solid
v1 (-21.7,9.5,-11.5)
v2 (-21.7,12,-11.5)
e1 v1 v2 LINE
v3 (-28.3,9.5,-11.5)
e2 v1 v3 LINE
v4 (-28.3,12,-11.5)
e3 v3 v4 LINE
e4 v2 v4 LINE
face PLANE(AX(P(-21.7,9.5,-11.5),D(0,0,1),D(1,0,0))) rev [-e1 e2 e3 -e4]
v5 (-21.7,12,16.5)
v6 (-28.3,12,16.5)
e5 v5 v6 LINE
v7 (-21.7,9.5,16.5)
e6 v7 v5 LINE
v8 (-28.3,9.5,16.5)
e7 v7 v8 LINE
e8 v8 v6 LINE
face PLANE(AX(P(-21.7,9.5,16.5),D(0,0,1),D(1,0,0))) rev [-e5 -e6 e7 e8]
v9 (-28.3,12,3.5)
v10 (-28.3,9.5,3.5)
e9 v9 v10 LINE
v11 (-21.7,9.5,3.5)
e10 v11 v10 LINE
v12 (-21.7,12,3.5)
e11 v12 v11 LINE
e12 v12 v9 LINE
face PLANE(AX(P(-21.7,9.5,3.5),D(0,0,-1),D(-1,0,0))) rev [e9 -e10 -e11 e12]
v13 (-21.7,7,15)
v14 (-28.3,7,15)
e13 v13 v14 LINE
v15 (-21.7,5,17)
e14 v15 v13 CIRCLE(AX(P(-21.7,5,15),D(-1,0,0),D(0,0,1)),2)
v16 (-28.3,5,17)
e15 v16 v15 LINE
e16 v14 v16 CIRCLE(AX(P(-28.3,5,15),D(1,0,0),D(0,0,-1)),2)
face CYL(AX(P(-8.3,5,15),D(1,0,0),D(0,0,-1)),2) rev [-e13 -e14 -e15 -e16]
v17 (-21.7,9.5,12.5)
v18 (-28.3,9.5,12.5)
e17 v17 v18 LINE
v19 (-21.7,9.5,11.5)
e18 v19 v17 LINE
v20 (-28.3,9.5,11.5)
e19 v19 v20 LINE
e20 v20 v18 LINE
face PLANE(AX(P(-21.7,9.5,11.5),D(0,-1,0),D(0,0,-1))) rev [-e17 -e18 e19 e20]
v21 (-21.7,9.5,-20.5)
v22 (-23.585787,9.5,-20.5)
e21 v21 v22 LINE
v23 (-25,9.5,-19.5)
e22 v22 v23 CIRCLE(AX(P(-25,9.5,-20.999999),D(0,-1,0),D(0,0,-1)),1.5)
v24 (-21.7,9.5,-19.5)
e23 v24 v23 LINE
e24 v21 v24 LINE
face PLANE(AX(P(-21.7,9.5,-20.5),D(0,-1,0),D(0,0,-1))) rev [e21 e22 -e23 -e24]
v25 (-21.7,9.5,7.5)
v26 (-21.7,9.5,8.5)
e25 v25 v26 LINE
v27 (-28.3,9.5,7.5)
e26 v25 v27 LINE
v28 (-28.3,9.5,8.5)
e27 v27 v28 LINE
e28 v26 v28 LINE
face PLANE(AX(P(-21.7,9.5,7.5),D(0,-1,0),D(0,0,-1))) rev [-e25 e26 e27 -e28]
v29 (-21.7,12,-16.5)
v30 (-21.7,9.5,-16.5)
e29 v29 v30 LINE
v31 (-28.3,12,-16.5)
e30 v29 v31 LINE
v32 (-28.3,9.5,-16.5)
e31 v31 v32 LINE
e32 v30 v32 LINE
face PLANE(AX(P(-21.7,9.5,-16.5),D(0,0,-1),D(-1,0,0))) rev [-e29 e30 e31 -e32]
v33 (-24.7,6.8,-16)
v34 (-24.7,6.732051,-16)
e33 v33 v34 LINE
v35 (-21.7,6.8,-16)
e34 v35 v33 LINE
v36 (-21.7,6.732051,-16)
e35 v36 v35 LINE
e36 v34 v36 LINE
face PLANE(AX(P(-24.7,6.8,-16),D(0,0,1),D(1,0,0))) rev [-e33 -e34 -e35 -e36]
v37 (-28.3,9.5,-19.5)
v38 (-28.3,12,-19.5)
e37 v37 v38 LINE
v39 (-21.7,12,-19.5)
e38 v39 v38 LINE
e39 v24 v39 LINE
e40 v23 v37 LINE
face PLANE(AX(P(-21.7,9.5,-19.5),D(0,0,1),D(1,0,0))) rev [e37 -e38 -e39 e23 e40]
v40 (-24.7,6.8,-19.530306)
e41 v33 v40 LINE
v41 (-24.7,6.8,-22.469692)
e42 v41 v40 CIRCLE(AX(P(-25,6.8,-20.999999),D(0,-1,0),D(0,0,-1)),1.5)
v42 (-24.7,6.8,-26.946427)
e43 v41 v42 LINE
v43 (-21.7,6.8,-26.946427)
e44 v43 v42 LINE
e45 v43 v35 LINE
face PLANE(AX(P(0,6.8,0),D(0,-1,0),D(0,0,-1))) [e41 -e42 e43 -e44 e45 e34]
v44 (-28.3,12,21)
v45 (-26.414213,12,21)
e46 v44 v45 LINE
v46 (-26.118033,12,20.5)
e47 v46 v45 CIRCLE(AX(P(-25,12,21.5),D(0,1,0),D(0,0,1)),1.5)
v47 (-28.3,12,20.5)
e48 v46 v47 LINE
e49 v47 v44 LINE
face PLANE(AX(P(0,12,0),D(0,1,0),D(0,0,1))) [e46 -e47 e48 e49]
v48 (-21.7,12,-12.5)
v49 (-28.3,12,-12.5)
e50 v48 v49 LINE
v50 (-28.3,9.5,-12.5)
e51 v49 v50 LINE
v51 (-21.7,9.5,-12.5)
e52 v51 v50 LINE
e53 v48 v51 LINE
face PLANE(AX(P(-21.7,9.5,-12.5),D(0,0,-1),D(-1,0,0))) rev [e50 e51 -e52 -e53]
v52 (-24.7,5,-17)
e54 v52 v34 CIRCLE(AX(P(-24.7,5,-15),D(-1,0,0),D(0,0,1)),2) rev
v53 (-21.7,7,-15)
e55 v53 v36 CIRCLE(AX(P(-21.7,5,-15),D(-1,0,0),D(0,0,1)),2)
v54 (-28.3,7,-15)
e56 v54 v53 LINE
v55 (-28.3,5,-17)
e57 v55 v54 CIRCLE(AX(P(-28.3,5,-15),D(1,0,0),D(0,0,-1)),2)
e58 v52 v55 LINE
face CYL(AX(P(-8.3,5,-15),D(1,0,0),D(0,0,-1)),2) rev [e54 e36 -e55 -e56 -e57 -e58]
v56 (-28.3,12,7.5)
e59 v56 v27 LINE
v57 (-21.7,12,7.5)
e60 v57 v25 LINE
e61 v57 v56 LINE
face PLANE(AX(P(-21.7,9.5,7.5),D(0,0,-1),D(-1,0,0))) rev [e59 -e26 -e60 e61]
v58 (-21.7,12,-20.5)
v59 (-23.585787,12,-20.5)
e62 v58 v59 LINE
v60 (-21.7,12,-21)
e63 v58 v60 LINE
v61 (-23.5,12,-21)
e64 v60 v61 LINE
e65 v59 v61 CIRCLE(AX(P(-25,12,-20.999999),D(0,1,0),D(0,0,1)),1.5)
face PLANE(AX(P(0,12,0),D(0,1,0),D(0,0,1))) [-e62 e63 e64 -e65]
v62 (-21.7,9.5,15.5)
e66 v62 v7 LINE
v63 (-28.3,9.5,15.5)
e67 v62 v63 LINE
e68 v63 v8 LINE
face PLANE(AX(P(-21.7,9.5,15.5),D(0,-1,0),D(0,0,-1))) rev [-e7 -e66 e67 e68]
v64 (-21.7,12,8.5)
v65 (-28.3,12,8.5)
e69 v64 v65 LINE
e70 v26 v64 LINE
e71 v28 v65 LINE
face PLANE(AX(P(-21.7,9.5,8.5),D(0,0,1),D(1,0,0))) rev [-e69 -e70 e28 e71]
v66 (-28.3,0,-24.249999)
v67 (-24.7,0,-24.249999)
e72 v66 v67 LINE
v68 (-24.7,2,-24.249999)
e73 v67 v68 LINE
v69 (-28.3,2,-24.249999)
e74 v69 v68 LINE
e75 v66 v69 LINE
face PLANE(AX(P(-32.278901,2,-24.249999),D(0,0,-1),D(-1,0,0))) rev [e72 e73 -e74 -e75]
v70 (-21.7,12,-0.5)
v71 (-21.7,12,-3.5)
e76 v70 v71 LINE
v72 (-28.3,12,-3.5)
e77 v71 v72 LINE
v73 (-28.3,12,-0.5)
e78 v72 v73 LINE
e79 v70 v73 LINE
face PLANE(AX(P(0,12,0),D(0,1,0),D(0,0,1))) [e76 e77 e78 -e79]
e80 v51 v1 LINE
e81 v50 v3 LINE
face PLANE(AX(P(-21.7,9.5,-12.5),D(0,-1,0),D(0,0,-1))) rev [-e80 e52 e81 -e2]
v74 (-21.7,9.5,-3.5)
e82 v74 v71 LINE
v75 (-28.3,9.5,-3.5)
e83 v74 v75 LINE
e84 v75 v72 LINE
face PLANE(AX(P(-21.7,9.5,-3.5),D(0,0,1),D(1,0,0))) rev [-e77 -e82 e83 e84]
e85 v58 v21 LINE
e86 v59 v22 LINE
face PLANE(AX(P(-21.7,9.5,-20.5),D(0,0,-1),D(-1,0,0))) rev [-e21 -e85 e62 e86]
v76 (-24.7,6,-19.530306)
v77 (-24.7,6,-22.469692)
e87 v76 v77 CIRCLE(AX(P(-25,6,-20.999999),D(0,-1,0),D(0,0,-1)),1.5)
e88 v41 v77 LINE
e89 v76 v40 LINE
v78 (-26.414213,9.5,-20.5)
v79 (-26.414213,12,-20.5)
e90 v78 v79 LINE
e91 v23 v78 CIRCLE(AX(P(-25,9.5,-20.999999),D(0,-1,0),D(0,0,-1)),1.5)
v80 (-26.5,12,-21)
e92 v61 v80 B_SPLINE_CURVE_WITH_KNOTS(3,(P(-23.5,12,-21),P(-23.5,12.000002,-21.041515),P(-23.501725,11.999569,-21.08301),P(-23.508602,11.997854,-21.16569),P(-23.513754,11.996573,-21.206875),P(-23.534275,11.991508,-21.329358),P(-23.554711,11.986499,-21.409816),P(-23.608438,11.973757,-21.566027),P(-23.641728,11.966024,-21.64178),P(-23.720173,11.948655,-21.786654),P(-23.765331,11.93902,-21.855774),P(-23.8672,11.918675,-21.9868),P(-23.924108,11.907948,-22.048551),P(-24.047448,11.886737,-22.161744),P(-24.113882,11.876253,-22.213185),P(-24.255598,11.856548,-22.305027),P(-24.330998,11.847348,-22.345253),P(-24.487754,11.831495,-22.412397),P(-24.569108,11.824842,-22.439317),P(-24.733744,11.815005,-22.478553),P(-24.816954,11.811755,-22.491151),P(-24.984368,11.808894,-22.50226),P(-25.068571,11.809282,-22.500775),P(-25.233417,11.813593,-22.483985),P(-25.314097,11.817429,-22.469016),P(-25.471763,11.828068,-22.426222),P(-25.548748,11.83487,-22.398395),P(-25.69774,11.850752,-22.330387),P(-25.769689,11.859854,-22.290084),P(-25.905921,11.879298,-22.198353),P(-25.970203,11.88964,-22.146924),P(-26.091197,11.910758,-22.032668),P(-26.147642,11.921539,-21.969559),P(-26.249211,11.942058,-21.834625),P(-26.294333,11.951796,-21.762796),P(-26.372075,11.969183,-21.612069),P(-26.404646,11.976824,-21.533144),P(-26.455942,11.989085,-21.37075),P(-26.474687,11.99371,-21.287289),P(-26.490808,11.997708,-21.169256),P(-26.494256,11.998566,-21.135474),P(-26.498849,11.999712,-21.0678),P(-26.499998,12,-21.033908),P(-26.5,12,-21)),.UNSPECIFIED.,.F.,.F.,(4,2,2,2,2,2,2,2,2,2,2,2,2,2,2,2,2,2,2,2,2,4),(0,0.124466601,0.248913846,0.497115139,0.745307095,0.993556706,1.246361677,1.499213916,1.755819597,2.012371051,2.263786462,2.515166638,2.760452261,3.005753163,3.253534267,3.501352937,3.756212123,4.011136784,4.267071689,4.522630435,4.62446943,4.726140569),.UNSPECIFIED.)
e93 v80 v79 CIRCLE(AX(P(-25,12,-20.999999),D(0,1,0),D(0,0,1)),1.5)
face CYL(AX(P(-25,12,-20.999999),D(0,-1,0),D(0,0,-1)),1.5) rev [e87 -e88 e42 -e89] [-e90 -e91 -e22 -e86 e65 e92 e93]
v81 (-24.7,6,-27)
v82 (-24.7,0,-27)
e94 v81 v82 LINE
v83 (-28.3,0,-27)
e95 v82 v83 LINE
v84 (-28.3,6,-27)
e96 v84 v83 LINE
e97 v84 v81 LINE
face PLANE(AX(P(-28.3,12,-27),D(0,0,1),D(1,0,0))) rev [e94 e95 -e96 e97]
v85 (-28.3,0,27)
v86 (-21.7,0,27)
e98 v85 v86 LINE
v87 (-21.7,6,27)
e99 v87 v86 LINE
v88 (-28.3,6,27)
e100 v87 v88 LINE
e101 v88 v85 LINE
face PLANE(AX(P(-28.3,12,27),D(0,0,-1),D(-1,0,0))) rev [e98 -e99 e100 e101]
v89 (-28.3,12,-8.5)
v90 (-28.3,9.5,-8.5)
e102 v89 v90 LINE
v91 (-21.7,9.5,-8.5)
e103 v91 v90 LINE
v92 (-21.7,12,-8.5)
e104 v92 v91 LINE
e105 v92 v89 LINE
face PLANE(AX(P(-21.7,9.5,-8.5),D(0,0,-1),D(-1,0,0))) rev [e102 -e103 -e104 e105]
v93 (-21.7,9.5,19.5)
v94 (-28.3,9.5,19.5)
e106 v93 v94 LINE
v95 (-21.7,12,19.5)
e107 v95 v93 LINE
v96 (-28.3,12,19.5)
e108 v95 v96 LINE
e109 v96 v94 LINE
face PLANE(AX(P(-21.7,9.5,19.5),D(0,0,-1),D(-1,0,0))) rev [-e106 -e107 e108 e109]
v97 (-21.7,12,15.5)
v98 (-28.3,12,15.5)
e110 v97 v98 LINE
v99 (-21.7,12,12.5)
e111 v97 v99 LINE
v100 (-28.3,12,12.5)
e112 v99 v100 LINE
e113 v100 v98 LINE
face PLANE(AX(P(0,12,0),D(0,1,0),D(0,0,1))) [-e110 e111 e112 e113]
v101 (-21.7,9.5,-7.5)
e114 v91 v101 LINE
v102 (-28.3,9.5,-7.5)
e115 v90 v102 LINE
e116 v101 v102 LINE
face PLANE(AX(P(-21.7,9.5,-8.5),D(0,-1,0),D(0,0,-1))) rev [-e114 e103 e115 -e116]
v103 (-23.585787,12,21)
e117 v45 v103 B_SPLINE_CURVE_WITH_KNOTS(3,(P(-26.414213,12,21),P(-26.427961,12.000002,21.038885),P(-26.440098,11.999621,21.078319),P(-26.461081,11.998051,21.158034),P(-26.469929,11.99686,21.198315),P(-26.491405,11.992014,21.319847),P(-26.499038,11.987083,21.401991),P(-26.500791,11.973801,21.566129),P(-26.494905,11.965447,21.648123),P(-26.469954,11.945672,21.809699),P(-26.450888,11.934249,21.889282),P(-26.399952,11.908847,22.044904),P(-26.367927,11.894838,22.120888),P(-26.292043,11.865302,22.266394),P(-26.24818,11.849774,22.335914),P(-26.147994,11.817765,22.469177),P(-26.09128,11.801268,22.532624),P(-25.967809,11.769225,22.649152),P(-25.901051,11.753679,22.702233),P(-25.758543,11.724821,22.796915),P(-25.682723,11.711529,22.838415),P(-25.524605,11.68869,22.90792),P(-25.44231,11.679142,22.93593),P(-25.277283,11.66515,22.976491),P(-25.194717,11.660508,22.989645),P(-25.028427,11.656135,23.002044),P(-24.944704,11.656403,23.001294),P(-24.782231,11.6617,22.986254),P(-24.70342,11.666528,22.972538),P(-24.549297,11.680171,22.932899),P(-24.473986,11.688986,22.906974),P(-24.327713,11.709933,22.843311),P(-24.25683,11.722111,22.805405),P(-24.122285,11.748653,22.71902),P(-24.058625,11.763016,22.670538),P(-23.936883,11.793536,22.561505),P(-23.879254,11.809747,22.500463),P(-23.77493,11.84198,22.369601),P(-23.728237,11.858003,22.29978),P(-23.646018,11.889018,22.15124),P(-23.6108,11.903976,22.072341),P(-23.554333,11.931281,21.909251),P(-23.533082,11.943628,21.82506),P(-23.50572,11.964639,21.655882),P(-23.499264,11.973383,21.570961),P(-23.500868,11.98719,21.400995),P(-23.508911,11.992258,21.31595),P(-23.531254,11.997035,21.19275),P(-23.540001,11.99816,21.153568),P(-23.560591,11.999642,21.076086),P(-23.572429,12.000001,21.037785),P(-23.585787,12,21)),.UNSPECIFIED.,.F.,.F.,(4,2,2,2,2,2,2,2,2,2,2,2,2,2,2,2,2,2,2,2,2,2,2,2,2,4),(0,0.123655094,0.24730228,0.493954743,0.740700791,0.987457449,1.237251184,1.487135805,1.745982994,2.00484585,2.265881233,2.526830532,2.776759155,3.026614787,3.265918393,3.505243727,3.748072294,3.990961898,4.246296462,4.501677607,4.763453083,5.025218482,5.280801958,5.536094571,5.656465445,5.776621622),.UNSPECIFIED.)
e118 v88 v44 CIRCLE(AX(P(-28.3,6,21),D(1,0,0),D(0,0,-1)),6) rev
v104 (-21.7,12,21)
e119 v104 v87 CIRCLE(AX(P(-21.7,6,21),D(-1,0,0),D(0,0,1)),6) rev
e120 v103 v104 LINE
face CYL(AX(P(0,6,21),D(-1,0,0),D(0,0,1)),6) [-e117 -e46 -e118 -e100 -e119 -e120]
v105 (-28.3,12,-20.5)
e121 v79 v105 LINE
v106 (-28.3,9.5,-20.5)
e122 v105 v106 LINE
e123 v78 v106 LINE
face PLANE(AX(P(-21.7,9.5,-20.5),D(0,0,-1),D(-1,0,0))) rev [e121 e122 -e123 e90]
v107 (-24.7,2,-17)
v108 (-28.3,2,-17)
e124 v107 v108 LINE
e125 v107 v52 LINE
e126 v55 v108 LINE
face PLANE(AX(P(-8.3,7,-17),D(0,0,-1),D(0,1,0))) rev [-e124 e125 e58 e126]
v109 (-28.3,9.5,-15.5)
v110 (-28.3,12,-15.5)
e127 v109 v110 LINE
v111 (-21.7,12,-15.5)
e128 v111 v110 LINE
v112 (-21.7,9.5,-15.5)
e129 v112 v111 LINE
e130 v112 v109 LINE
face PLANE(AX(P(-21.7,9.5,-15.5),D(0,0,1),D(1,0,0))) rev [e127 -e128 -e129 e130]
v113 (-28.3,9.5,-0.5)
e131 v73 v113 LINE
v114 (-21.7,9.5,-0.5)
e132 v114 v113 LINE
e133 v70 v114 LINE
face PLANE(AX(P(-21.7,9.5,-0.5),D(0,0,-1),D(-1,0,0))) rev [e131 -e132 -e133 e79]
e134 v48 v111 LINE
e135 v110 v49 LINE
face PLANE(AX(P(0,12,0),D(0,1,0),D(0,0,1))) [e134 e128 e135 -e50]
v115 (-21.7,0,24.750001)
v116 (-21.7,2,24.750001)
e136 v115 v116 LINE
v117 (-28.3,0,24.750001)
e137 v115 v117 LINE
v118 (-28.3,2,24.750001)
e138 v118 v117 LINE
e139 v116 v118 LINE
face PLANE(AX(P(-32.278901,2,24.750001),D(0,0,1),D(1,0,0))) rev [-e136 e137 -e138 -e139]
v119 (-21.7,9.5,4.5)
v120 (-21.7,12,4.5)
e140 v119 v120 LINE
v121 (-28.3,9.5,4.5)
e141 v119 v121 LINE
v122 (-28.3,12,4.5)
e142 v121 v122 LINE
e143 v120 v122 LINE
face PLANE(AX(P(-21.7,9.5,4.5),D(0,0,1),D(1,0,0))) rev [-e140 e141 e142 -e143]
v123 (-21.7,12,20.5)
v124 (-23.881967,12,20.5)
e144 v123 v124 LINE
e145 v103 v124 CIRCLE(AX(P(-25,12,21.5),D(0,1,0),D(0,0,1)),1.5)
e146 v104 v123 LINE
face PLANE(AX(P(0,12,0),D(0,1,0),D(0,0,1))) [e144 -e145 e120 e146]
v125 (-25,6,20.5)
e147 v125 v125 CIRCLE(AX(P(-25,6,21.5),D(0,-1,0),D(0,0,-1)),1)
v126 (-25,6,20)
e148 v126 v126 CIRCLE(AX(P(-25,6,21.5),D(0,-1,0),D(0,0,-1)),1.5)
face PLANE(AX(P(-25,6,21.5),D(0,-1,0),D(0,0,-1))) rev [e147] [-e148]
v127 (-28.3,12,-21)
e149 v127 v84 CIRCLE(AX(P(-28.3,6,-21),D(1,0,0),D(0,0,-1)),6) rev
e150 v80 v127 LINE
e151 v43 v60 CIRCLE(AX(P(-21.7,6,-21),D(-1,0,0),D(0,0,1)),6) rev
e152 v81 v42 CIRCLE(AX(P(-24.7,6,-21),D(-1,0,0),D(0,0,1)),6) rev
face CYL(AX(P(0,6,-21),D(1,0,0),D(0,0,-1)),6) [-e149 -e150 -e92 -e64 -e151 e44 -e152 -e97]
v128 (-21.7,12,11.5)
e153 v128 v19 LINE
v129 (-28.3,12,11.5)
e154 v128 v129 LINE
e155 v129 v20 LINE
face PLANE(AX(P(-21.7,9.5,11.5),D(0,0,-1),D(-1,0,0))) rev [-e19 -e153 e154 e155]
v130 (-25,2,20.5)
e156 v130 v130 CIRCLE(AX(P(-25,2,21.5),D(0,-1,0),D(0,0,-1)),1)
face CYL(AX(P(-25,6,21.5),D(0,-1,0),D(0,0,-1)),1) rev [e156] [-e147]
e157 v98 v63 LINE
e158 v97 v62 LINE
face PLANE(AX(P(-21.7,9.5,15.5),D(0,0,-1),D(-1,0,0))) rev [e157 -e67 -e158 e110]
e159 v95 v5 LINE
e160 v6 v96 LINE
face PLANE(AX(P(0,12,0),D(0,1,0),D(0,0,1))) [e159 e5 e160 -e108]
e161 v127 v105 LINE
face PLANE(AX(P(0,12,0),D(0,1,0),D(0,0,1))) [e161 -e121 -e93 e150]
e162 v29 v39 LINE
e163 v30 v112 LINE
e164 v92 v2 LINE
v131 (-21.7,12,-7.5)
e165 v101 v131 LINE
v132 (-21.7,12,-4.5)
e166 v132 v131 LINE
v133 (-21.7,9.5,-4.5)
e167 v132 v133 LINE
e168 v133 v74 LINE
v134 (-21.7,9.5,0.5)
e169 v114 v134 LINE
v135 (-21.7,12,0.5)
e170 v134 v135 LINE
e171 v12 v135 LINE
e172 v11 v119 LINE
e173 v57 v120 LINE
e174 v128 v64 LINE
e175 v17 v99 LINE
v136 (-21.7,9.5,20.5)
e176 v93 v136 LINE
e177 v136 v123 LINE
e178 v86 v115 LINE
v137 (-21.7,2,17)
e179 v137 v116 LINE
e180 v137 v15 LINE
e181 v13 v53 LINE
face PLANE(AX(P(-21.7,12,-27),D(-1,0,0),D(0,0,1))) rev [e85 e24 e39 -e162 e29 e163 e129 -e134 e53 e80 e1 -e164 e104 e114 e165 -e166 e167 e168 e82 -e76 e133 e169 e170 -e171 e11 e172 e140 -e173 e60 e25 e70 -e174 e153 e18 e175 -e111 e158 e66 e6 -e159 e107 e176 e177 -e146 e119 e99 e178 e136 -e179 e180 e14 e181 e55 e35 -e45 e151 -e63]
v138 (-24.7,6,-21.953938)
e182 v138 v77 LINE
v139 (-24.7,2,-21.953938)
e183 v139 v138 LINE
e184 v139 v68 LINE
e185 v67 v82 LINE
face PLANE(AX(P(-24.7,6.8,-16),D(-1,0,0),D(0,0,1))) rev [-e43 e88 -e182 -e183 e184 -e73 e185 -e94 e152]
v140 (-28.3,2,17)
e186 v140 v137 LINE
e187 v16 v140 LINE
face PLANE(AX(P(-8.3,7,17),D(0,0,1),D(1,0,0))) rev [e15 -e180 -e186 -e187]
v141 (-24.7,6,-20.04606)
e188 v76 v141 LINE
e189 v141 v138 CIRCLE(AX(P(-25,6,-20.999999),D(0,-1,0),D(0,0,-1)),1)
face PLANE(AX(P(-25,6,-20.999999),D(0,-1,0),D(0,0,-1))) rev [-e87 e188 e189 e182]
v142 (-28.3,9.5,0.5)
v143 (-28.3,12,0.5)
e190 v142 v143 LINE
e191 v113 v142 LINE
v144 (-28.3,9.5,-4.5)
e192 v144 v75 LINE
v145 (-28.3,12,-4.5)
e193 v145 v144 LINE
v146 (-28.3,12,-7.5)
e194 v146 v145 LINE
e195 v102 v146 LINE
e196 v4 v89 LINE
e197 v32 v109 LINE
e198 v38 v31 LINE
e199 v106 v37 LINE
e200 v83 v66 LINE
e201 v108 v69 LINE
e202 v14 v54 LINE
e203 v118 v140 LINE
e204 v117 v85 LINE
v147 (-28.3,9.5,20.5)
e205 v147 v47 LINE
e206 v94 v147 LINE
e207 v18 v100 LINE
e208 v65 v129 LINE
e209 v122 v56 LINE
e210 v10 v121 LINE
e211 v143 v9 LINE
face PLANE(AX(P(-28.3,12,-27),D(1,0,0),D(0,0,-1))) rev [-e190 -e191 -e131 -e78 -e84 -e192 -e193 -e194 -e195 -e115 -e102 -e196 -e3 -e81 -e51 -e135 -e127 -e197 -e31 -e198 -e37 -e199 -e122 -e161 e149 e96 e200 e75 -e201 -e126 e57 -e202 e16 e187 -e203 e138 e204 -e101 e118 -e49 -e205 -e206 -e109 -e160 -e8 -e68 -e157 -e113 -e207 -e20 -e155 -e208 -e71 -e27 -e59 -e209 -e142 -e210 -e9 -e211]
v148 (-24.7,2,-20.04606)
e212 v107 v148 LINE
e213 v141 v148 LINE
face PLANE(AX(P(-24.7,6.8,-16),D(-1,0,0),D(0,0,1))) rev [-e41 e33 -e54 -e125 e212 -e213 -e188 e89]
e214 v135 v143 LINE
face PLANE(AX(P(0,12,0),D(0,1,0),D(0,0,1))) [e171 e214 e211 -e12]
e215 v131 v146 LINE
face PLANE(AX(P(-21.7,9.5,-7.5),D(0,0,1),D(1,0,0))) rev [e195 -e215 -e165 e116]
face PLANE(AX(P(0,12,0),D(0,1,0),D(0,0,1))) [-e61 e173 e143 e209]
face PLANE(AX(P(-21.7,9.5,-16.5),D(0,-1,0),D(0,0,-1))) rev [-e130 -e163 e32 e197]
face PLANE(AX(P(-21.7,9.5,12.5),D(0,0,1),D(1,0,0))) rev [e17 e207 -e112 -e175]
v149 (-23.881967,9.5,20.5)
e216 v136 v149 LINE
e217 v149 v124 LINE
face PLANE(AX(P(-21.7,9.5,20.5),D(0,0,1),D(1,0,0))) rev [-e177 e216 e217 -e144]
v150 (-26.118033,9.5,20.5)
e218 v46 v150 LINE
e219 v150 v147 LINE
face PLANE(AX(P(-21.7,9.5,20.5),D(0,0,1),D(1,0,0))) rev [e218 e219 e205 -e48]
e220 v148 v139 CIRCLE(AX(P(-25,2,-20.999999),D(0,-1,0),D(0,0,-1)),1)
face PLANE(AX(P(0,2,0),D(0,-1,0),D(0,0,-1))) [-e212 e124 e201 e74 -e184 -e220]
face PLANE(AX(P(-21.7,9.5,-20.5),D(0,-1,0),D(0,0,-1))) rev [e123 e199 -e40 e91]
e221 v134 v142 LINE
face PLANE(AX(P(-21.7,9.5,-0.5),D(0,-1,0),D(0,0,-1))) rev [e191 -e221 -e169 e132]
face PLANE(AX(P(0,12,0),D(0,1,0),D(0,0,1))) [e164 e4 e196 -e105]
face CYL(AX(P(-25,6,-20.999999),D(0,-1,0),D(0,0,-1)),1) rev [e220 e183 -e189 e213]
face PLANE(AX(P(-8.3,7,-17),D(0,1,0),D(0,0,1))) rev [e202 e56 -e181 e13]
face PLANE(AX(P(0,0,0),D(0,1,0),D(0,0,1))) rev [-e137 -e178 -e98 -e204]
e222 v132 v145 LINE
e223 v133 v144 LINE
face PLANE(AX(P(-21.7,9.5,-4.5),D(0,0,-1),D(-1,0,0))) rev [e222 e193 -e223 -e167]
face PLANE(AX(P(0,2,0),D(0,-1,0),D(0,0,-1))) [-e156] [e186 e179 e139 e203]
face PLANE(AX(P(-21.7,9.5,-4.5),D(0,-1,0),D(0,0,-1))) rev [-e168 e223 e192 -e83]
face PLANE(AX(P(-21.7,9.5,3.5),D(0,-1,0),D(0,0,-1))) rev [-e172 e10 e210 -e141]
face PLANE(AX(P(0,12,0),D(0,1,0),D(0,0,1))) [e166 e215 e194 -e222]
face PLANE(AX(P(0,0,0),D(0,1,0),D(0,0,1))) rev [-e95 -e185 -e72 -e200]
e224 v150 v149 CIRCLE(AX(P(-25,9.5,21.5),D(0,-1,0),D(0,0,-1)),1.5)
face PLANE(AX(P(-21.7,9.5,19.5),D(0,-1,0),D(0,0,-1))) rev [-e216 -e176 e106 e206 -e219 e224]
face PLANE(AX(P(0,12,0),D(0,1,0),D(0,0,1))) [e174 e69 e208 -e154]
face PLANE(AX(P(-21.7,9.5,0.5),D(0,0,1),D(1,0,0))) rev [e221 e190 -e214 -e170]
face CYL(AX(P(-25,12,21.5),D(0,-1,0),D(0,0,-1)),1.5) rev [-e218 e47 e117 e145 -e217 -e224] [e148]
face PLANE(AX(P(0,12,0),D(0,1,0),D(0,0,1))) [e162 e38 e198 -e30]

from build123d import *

# Parameters (mm, degrees)
SKETCH_1_W          = 6.6
SKETCH_1_H          = 54
SKETCH_1_R          = 1.49999954
EXTRUDE_1_DEPTH     = 12
FILLET_1_R          = 6
SKETCH_2_W          = 34
SKETCH_2_H          = 14
CUT_EXTRUDE_1_DEPTH = 20
FILLET_2_R          = 2
SKETCH_3_W          = 1
SKETCH_3_H          = 2.5
CUT_EXTRUDE_2_DEPTH = 31.274742098
SKETCH_4_W          = 14.557801868
SKETCH_4_H          = 49
CUT_EXTRUDE_3_DEPTH = 2
SKETCH_6_R          = 1.5
SKETCH_6_R_2        = 1
SKETCH_6_R_3        = 1.49999954
EXTRUDE_2_DEPTH     = 4
SKETCH_7_W          = 6
SKETCH_7_H          = 22
CUT_EXTRUDE_4_DEPTH = 6.8


with BuildPart() as part:
    # 草图1 → 凸台-拉伸1 (new body)
    with BuildSketch(Plane(origin=(0, 0, 0), x_dir=(1, 0, 0), z_dir=(0, 1, 0))):
        with Locations((-25, 0)):
            Rectangle(SKETCH_1_W, SKETCH_1_H)
        with Locations(Location((-25, -21.49999992, 0), (0, 0, 270))):
            Circle(SKETCH_1_R, mode=Mode.SUBTRACT)
        with Locations(Location((-25, 20.9999989, 0), (0, 0, 270))):
            Circle(SKETCH_1_R, mode=Mode.SUBTRACT)
    extrude(amount=EXTRUDE_1_DEPTH)

    # 圆角1
    # the kernel refuses this fillet: 6 mm, written as the material it takes off along each edge
    with BuildSketch(Plane(origin=(-6.7, 12, 27), x_dir=(0, -1, 0), z_dir=(-1, 0, 0)), Plane(origin=(-43.3, 12, -27), x_dir=(0, -1, 0), z_dir=(1, 0, 0))) as fillet_1_piece_1:
        with BuildLine():
            CenterArc((FILLET_1_R, -FILLET_1_R), FILLET_1_R, 90, 90)
            Line((0, -FILLET_1_R), (0, 0))
            Line((0, 0), (FILLET_1_R, 0))
        make_face()
    extrude(amount=36.6, mode=Mode.SUBTRACT)

    # 草图2 → 切除-拉伸1 (cut)
    with BuildSketch(Plane.ZY.offset(28.3)):
        Rectangle(SKETCH_2_W, SKETCH_2_H)
    extrude(amount=-CUT_EXTRUDE_1_DEPTH, mode=Mode.SUBTRACT)

    # 圆角2
    fillet_2_edges = [part.edges().sort_by_distance(p)[0] for p in [
        (-25, 7, 17),
        (-25, 7, -17),
    ]]
    fillet(fillet_2_edges, radius=FILLET_2_R)

    # 草图3 → 切除-拉伸2 (cut, through all)
    with BuildSketch(Plane.ZY.offset(28.3)):
        with Locations((0, 10.75)):
            Rectangle(SKETCH_3_W, SKETCH_3_H)
        with Locations((4, 10.75)):
            Rectangle(SKETCH_3_W, SKETCH_3_H)
        with Locations((8, 10.75)):
            Rectangle(SKETCH_3_W, SKETCH_3_H)
        with Locations((12, 10.75)):
            Rectangle(SKETCH_3_W, SKETCH_3_H)
        with Locations((16, 10.75)):
            Rectangle(SKETCH_3_W, SKETCH_3_H)
        with Locations((20, 10.75)):
            Rectangle(SKETCH_3_W, SKETCH_3_H)
        with Locations((-4, 10.75)):
            Rectangle(SKETCH_3_W, SKETCH_3_H)
        with Locations((-8, 10.75)):
            Rectangle(SKETCH_3_W, SKETCH_3_H)
        with Locations((-12, 10.75)):
            Rectangle(SKETCH_3_W, SKETCH_3_H)
        with Locations((-16, 10.75)):
            Rectangle(SKETCH_3_W, SKETCH_3_H)
        with Locations((-20, 10.75)):
            Rectangle(SKETCH_3_W, SKETCH_3_H)
    extrude(amount=-CUT_EXTRUDE_2_DEPTH, mode=Mode.SUBTRACT)

    # 草图4 → 切除-拉伸3 (cut)
    with BuildSketch(Plane.XZ):
        with Locations((-25, 0.25000051)):
            Rectangle(SKETCH_4_W, SKETCH_4_H)
    extrude(amount=-CUT_EXTRUDE_3_DEPTH, mode=Mode.SUBTRACT)

    # 草图6 → 凸台-拉伸2 (add)
    # profile 1 of 2: a face of its own
    with BuildSketch(Plane.XZ.offset(-2)):
        with Locations(Location((-25, 21.49999992, 0), (0, 0, 270))):
            Circle(SKETCH_6_R)
        with Locations(Location((-25, 21.49999992, 0), (0, 0, 270))):
            Circle(SKETCH_6_R_2, mode=Mode.SUBTRACT)
    # profile 2 of 2: a face of its own
    with BuildSketch(Plane.XZ.offset(-2)):
        with Locations(Location((-25, -20.9999989, 0), (0, 0, 270))):
            Circle(SKETCH_6_R_3)
        with Locations(Location((-25, -20.9999989, 0), (0, 0, 270))):
            Circle(SKETCH_6_R_2, mode=Mode.SUBTRACT)
    extrude(amount=-EXTRUDE_2_DEPTH)

    # 草图7 → 切除-拉伸4 (cut)
    with BuildSketch(Plane.XZ):
        with Locations((-21.7, -27)):
            Rectangle(SKETCH_7_W, SKETCH_7_H)
    extrude(amount=-CUT_EXTRUDE_4_DEPTH, mode=Mode.SUBTRACT)


solid = part.part
